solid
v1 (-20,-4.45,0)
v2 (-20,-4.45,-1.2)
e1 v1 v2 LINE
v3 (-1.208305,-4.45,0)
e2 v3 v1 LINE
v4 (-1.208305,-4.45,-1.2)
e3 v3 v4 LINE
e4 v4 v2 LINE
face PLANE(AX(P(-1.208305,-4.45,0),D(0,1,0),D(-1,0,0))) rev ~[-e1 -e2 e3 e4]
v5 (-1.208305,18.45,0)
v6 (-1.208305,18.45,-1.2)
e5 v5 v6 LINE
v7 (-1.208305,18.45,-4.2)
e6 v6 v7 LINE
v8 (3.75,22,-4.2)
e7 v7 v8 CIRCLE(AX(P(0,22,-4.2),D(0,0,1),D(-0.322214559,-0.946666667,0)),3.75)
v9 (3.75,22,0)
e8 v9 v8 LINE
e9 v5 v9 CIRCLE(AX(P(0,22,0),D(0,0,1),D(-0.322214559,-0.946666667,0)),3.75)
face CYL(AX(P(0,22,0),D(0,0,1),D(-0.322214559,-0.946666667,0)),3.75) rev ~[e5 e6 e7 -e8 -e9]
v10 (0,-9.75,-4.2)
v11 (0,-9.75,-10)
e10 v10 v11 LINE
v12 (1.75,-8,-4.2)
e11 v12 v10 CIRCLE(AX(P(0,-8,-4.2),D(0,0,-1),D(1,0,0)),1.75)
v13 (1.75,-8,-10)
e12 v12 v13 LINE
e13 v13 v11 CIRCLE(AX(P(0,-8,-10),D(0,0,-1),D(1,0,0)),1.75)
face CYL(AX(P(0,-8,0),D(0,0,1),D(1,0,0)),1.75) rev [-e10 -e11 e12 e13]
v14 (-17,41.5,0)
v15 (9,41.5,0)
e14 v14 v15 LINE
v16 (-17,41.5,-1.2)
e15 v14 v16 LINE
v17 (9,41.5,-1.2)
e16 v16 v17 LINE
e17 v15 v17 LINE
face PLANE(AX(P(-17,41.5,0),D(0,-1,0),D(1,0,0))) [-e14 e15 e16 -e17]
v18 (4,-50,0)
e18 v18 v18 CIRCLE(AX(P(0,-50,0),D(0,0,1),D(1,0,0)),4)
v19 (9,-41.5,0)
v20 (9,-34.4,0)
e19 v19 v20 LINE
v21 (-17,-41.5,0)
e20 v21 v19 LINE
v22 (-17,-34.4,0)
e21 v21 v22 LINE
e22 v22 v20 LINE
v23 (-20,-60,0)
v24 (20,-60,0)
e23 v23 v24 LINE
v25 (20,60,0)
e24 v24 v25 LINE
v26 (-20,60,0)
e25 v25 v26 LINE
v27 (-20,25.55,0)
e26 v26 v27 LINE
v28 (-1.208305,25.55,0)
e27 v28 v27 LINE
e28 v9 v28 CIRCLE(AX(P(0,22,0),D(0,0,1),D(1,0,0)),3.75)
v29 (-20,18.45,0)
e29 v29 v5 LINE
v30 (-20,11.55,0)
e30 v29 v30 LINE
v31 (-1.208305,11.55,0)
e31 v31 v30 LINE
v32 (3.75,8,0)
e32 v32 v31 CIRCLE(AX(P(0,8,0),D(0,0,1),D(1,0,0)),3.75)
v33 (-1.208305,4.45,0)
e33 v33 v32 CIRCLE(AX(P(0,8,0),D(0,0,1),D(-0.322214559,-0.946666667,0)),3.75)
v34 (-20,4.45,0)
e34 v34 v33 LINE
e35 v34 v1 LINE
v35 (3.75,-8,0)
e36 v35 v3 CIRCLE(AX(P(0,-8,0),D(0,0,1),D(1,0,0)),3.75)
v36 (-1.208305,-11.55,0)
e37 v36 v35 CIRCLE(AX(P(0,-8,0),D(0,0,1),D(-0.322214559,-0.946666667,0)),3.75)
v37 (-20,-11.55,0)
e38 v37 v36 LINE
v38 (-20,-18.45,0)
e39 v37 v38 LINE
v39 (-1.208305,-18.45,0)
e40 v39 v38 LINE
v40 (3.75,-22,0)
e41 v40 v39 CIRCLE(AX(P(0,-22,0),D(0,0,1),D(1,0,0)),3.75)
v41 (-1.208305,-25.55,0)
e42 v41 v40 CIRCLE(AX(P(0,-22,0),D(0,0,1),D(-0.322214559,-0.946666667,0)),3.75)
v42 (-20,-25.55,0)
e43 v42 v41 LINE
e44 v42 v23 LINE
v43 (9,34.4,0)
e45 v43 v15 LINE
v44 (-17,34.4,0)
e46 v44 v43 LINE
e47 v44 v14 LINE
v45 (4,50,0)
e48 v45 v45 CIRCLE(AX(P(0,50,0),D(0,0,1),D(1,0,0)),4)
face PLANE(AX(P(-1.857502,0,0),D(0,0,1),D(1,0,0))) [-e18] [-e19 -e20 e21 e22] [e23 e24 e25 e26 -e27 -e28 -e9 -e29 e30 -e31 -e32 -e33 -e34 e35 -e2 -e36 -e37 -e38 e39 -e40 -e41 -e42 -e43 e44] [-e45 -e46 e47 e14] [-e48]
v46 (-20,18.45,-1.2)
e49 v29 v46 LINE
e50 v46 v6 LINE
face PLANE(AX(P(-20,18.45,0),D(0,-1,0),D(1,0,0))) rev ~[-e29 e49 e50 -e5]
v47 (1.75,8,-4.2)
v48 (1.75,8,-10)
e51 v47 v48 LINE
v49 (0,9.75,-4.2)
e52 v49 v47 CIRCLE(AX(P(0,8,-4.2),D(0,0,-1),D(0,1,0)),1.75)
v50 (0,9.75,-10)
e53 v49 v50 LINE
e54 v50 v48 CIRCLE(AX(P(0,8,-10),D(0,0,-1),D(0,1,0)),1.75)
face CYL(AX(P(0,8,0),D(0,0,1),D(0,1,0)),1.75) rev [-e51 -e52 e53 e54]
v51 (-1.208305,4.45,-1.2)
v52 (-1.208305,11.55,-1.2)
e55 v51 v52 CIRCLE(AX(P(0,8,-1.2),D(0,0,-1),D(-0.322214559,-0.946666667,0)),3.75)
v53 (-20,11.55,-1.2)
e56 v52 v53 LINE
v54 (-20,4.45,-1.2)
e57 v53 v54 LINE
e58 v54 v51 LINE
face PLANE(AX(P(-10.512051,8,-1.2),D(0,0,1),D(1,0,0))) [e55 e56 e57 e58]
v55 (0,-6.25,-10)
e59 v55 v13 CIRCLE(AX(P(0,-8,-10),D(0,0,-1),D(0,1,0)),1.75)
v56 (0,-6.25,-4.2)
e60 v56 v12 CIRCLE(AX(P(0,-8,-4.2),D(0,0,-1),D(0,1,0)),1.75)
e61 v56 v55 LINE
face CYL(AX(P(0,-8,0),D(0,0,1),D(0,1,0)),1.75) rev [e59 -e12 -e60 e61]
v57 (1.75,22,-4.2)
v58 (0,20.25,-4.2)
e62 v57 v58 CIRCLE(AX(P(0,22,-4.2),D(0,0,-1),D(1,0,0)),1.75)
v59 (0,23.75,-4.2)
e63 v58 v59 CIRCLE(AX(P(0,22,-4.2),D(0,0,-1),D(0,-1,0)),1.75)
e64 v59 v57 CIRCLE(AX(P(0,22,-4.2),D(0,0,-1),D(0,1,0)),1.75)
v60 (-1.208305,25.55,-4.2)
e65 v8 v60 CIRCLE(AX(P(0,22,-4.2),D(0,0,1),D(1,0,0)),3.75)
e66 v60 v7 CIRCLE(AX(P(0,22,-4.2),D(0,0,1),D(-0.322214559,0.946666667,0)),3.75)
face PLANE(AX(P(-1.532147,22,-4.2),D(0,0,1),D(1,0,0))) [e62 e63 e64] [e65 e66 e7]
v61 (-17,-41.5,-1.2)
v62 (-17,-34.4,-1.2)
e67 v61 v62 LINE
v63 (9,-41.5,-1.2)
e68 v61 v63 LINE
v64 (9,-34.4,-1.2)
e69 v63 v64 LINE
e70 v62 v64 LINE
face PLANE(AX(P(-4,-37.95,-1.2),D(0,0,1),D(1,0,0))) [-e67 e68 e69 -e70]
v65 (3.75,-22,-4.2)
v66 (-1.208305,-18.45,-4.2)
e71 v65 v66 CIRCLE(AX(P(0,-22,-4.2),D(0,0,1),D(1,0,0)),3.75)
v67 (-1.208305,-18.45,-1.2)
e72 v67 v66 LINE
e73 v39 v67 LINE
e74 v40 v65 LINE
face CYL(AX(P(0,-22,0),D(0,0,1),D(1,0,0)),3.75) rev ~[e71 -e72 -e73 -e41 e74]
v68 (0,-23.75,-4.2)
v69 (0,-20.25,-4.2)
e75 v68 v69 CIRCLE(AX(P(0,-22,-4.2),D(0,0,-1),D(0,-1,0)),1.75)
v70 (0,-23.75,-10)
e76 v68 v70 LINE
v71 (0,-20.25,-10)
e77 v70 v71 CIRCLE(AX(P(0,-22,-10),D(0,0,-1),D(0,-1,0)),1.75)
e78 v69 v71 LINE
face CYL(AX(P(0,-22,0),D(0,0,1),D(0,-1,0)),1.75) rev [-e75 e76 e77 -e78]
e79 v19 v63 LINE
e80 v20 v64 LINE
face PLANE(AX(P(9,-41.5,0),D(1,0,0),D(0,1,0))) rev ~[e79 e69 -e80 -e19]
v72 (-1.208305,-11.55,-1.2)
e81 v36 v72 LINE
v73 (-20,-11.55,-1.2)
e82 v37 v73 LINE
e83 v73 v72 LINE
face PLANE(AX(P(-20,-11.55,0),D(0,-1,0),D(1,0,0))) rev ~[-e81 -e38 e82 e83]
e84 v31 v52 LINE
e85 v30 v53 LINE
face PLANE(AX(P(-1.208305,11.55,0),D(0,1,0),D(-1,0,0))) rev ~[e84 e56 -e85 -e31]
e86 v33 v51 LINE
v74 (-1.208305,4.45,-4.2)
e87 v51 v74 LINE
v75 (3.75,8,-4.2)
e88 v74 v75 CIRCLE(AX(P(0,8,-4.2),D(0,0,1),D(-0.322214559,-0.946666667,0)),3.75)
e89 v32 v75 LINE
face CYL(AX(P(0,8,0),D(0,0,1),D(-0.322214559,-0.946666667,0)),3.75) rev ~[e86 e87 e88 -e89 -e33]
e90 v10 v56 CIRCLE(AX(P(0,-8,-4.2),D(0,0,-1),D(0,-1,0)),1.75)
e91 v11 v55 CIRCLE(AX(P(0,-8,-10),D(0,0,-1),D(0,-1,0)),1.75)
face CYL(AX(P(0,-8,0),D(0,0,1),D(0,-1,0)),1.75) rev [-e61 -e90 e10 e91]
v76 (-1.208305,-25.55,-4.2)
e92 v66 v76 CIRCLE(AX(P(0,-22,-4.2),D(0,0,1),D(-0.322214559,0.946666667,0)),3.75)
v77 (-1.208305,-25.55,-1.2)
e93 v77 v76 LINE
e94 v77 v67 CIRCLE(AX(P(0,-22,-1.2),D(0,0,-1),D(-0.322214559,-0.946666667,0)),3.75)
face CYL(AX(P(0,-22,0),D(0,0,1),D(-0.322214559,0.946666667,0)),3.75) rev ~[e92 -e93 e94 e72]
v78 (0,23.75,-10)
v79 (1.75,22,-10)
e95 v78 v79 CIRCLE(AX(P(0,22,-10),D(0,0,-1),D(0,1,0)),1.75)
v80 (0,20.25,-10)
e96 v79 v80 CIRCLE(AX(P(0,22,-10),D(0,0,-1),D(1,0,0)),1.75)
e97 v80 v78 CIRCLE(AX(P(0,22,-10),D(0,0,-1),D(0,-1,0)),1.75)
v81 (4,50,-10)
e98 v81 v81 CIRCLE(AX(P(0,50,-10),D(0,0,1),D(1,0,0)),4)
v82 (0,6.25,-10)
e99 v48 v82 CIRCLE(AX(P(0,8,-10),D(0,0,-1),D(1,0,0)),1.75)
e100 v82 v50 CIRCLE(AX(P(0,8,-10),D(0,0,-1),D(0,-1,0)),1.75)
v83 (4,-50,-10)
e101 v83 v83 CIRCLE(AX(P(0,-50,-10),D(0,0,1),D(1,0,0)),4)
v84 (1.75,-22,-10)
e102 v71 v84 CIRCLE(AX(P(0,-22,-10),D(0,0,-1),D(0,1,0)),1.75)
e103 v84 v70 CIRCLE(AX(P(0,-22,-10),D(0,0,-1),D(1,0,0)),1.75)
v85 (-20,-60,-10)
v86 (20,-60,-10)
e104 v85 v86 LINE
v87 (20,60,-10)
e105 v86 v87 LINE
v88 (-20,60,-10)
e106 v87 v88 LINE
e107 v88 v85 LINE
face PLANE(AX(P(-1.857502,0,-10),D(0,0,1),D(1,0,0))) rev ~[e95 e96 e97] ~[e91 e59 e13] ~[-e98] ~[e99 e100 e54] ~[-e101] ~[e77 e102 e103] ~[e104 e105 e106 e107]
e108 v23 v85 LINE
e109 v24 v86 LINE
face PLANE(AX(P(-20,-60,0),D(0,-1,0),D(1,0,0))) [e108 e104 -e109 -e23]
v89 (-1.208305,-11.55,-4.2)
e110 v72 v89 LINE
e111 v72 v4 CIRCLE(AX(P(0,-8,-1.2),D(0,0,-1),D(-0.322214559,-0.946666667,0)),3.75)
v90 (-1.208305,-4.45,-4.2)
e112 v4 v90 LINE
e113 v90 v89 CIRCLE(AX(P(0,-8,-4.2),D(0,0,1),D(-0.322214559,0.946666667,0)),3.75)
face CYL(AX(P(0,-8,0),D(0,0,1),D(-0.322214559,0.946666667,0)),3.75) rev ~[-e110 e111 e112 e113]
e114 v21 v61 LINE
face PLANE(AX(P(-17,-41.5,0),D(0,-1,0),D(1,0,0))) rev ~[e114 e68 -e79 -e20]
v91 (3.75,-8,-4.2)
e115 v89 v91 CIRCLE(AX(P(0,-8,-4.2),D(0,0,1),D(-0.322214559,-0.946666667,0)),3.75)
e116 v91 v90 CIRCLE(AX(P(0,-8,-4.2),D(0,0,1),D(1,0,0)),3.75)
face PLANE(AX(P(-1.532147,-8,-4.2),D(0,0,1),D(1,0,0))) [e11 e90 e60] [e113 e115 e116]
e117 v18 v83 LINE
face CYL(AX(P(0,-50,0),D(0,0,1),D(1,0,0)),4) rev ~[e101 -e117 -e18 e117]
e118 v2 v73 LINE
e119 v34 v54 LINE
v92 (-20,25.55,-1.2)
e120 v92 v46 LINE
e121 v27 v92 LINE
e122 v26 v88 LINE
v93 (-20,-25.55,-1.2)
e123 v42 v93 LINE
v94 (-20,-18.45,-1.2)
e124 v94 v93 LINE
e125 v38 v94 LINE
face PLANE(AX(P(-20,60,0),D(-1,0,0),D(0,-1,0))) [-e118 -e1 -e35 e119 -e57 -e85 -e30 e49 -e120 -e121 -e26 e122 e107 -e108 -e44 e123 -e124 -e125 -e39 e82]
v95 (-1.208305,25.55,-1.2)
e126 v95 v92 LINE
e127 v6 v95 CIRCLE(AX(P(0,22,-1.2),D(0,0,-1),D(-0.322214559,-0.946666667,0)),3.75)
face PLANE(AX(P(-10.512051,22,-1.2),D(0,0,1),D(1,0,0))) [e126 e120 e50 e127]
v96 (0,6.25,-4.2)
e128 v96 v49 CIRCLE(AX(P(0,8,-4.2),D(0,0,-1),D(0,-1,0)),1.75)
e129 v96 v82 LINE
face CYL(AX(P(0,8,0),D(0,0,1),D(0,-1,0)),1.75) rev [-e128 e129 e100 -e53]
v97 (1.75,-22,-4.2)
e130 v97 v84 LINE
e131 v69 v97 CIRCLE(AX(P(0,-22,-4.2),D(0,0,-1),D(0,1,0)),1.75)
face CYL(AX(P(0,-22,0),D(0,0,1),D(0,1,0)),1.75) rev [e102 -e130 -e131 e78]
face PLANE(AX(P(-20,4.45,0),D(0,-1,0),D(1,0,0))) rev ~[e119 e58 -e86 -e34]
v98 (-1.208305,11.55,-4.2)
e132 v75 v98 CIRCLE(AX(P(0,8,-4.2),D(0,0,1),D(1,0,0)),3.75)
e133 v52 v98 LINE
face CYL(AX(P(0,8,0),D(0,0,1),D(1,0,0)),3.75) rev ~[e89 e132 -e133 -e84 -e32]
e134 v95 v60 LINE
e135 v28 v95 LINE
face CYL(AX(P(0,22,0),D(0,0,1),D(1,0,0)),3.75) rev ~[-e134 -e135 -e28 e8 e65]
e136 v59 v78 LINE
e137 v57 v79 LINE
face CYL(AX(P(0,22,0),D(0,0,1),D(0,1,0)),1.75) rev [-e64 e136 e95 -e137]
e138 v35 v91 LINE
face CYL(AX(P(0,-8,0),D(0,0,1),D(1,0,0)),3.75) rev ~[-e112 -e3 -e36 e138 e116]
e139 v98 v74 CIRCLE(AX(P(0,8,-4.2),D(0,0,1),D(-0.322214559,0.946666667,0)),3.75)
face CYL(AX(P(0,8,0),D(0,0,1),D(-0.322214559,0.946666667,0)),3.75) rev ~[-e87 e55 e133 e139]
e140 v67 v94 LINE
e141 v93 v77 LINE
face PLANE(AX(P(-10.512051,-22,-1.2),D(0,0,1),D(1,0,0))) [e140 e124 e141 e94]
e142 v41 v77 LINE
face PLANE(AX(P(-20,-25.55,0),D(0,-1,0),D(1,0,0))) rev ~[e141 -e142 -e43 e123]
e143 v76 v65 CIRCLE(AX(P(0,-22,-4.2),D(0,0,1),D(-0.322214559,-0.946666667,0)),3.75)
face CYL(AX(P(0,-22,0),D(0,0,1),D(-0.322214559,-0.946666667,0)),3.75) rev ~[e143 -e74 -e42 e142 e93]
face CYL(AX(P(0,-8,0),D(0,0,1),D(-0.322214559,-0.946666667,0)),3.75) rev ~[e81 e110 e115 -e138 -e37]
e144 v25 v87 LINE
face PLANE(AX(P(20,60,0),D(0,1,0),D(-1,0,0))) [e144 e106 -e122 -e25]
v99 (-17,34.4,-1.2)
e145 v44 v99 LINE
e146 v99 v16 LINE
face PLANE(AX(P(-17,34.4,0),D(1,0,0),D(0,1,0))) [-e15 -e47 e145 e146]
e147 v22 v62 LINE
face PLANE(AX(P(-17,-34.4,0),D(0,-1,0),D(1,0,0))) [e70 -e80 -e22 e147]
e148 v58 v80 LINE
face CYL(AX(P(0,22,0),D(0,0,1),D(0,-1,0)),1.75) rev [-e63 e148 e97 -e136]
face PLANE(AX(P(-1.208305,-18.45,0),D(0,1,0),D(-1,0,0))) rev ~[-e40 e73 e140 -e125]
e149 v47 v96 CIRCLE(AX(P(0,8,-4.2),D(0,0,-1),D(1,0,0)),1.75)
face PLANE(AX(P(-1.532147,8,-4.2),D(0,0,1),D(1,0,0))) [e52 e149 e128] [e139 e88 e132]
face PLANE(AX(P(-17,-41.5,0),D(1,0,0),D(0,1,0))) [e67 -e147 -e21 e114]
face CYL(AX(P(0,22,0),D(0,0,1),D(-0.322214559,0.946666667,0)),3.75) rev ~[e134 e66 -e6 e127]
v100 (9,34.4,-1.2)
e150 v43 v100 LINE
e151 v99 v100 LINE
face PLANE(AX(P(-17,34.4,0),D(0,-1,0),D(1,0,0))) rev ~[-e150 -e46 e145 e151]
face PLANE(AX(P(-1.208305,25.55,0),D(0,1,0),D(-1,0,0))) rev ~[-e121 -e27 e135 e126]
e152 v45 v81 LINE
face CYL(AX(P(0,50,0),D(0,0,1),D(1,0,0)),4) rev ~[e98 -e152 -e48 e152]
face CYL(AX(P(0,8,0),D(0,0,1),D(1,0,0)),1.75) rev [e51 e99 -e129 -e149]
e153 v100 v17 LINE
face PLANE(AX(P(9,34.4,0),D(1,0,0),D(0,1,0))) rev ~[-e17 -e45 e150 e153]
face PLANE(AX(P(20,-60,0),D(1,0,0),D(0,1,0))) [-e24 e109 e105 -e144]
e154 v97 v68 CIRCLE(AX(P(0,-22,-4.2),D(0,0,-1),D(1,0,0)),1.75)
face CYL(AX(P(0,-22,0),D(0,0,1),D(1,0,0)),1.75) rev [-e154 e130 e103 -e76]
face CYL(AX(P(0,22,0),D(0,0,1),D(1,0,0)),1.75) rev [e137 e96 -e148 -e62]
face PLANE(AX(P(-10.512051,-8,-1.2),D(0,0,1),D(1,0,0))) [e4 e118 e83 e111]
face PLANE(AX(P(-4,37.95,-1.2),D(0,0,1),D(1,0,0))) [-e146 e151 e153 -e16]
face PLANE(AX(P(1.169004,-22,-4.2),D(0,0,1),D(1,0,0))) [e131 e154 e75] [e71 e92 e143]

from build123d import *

# Parameters (mm, degrees)
F0_W     = 26
F0_H     = 7.1
F0_R     = 4
F1_DEPTH = 10
F2_DEPTH = 1.2
F3_DEPTH = 4.2


# Not quite as in the source:
# - a feature names something its author has since deleted; it is built from what else it names


with BuildPart() as f1:
    # F0 (on Top) → F1 (new body)
    with BuildSketch(Plane.XY):
        with BuildLine():
            Line((-20, -60), (20, -60))
            Line((20, -60), (20, 60))
            Line((20, 60), (-20, 60))
            Line((-20, 60), (-20, 25.55))
            Line((-20, 25.55), (-1.2083045974, 25.55))
            ThreePointArc((-1.2083045974, 25.55), (2.1830434902, 25.0490688939), (3.75, 22))
            ThreePointArc((3.75, 22), (2.1830434902, 18.9509311061), (-1.2083045974, 18.45))
            Line((-1.2083045974, 18.45), (-20, 18.45))
            Line((-20, 18.45), (-20, 11.55))
            Line((-20, 11.55), (-1.2083045974, 11.55))
            ThreePointArc((-1.2083045974, 11.55), (2.1830434902, 11.0490688939), (3.75, 8))
            ThreePointArc((3.75, 8), (2.1830434902, 4.9509311061), (-1.2083045974, 4.45))
            Line((-1.2083045974, 4.45), (-20, 4.45))
            Line((-20, 4.45), (-20, -4.45))
            Line((-20, -4.45), (-1.2083045974, -4.45))
            ThreePointArc((-1.2083045974, -4.45), (2.1830434902, -4.9509311061), (3.75, -8))
            ThreePointArc((3.75, -8), (2.1830434902, -11.0490688939), (-1.2083045974, -11.55))
            Line((-1.2083045974, -11.55), (-20, -11.55))
            Line((-20, -11.55), (-20, -18.45))
            Line((-20, -18.45), (-1.2083045974, -18.45))
            ThreePointArc((-1.2083045974, -18.45), (2.1830434902, -18.9509311061), (3.75, -22))
            ThreePointArc((3.75, -22), (2.1830434902, -25.0490688939), (-1.2083045974, -25.55))
            Line((-1.2083045974, -25.55), (-20, -25.55))
            Line((-20, -25.55), (-20, -60))
        make_face()
        with Locations((-4, -37.95)):
            Rectangle(F0_W, F0_H, mode=Mode.SUBTRACT)
        with Locations((0, -50)):
            Circle(F0_R, mode=Mode.SUBTRACT)
        with Locations((-4, 37.95)):
            Rectangle(F0_W, F0_H, mode=Mode.SUBTRACT)
        with Locations((0, 50)):
            Circle(F0_R, mode=Mode.SUBTRACT)
        with BuildLine():
            Line((-20, -18.45), (-20, -25.55))
            Line((-20, -25.55), (-1.2083045974, -25.55))
            ThreePointArc((-1.2083045974, -25.55), (-3.75, -22), (-1.2083045974, -18.45))
            Line((-1.2083045974, -18.45), (-20, -18.45))
        make_face()
        with BuildLine():
            Line((-1.2083045974, 25.55), (-20, 25.55))
            Line((-20, 25.55), (-20, 18.45))
            Line((-20, 18.45), (-1.2083045974, 18.45))
            ThreePointArc((-1.2083045974, 18.45), (-3.75, 22), (-1.2083045974, 25.55))
        make_face()
        with BuildLine():
            Line((-20, -4.45), (-20, -11.55))
            Line((-20, -11.55), (-1.2083045974, -11.55))
            ThreePointArc((-1.2083045974, -11.55), (-3.75, -8), (-1.2083045974, -4.45))
            Line((-1.2083045974, -4.45), (-20, -4.45))
        make_face()
        with BuildLine():
            Line((-1.2083045974, 11.55), (-20, 11.55))
            Line((-20, 11.55), (-20, 4.45))
            Line((-20, 4.45), (-1.2083045974, 4.45))
            ThreePointArc((-1.2083045974, 4.45), (-3.75, 8), (-1.2083045974, 11.55))
        make_face()
        with BuildLine():
            Line((0, 25.55), (-1.2083045974, 25.55))
            ThreePointArc((-1.2083045974, 25.55), (-3.75, 22), (-1.2083045974, 18.45))
            Line((-1.2083045974, 18.45), (0, 18.45))
            Line((0, 18.45), (0, 20.25))
            ThreePointArc((0, 20.25), (-1.75, 22), (0, 23.75))
            Line((0, 23.75), (0, 25.55))
        make_face()
        with BuildLine():
            ThreePointArc((3.75, 22), (2.1830434902, 25.0490688939), (-1.2083045974, 25.55))
            Line((-1.2083045974, 25.55), (0, 25.55))
            Line((0, 25.55), (0, 23.75))
            ThreePointArc((0, 23.75), (1.2374368671, 23.2374368671), (1.75, 22))
            ThreePointArc((1.75, 22), (1.2374368671, 20.7625631329), (0, 20.25))
            Line((0, 20.25), (0, 18.45))
            Line((0, 18.45), (-1.2083045974, 18.45))
            ThreePointArc((-1.2083045974, 18.45), (2.1830434902, 18.9509311061), (3.75, 22))
        make_face()
        with BuildLine():
            ThreePointArc((3.75, 8), (2.1830434902, 11.0490688939), (-1.2083045974, 11.55))
            Line((-1.2083045974, 11.55), (0, 11.55))
            Line((0, 11.55), (0, 9.75))
            ThreePointArc((0, 9.75), (1.2374368671, 9.2374368671), (1.75, 8))
            ThreePointArc((1.75, 8), (1.2374368671, 6.7625631329), (0, 6.25))
            Line((0, 6.25), (0, 4.45))
            Line((0, 4.45), (-1.2083045974, 4.45))
            ThreePointArc((-1.2083045974, 4.45), (2.1830434902, 4.9509311061), (3.75, 8))
        make_face()
        with BuildLine():
            Line((0, 11.55), (-1.2083045974, 11.55))
            ThreePointArc((-1.2083045974, 11.55), (-3.75, 8), (-1.2083045974, 4.45))
            Line((-1.2083045974, 4.45), (0, 4.45))
            Line((0, 4.45), (0, 6.25))
            ThreePointArc((0, 6.25), (-1.75, 8), (0, 9.75))
            Line((0, 9.75), (0, 11.55))
        make_face()
        with BuildLine():
            ThreePointArc((-1.2083045974, -4.45), (-3.75, -8), (-1.2083045974, -11.55))
            Line((-1.2083045974, -11.55), (0, -11.55))
            Line((0, -11.55), (0, -9.75))
            ThreePointArc((0, -9.75), (-1.75, -8), (0, -6.25))
            Line((0, -6.25), (0, -4.45))
            Line((0, -4.45), (-1.2083045974, -4.45))
        make_face()
        with BuildLine():
            Line((0, -11.55), (-1.2083045974, -11.55))
            ThreePointArc((-1.2083045974, -11.55), (2.1830434902, -11.0490688939), (3.75, -8))
            ThreePointArc((3.75, -8), (2.1830434902, -4.9509311061), (-1.2083045974, -4.45))
            Line((-1.2083045974, -4.45), (0, -4.45))
            Line((0, -4.45), (0, -6.25))
            ThreePointArc((0, -6.25), (1.2374368671, -6.7625631329), (1.75, -8))
            ThreePointArc((1.75, -8), (1.2374368671, -9.2374368671), (0, -9.75))
            Line((0, -9.75), (0, -11.55))
        make_face()
        with BuildLine():
            Line((0, -25.55), (-1.2083045974, -25.55))
            ThreePointArc((-1.2083045974, -25.55), (2.1830434902, -25.0490688939), (3.75, -22))
            ThreePointArc((3.75, -22), (2.1830434902, -18.9509311061), (-1.2083045974, -18.45))
            Line((-1.2083045974, -18.45), (0, -18.45))
            Line((0, -18.45), (0, -20.25))
            ThreePointArc((0, -20.25), (1.2374368671, -20.7625631329), (1.75, -22))
            ThreePointArc((1.75, -22), (1.2374368671, -23.2374368671), (0, -23.75))
            Line((0, -23.75), (0, -25.55))
        make_face()
        with BuildLine():
            ThreePointArc((-1.2083045974, -18.45), (-3.75, -22), (-1.2083045974, -25.55))
            Line((-1.2083045974, -25.55), (0, -25.55))
            Line((0, -25.55), (0, -23.75))
            ThreePointArc((0, -23.75), (-1.75, -22), (0, -20.25))
            Line((0, -20.25), (0, -18.45))
            Line((0, -18.45), (-1.2083045974, -18.45))
        make_face()
        with Locations((-4, 37.95)):
            Rectangle(F0_W, F0_H)
        with Locations((-4, -37.95)):
            Rectangle(F0_W, F0_H)
    extrude(amount=-F1_DEPTH)

    # F0 (on Top) → F2 (cut)
    with BuildSketch(Plane.XY):
        with BuildLine():
            Line((-1.2083045974, 25.55), (-20, 25.55))
            Line((-20, 25.55), (-20, 18.45))
            Line((-20, 18.45), (-1.2083045974, 18.45))
            ThreePointArc((-1.2083045974, 18.45), (-3.75, 22), (-1.2083045974, 25.55))
        make_face()
        with BuildLine():
            Line((-1.2083045974, 11.55), (-20, 11.55))
            Line((-20, 11.55), (-20, 4.45))
            Line((-20, 4.45), (-1.2083045974, 4.45))
            ThreePointArc((-1.2083045974, 4.45), (-3.75, 8), (-1.2083045974, 11.55))
        make_face()
        with BuildLine():
            Line((-20, -4.45), (-20, -11.55))
            Line((-20, -11.55), (-1.2083045974, -11.55))
            ThreePointArc((-1.2083045974, -11.55), (-3.75, -8), (-1.2083045974, -4.45))
            Line((-1.2083045974, -4.45), (-20, -4.45))
        make_face()
        with BuildLine():
            Line((-20, -18.45), (-20, -25.55))
            Line((-20, -25.55), (-1.2083045974, -25.55))
            ThreePointArc((-1.2083045974, -25.55), (-3.75, -22), (-1.2083045974, -18.45))
            Line((-1.2083045974, -18.45), (-20, -18.45))
        make_face()
        with Locations((-4, 37.95)):
            Rectangle(F0_W, F0_H)
        with Locations((-4, -37.95)):
            Rectangle(F0_W, F0_H)
    extrude(amount=-F2_DEPTH, mode=Mode.SUBTRACT)

    # F0 (on Top) → F3 (cut)
    with BuildSketch(Plane.XY):
        with BuildLine():
            Line((0, 25.55), (-1.2083045974, 25.55))
            ThreePointArc((-1.2083045974, 25.55), (-3.75, 22), (-1.2083045974, 18.45))
            Line((-1.2083045974, 18.45), (0, 18.45))
            Line((0, 18.45), (0, 20.25))
            ThreePointArc((0, 20.25), (-1.75, 22), (0, 23.75))
            Line((0, 23.75), (0, 25.55))
        make_face()
        with BuildLine():
            ThreePointArc((3.75, 22), (2.1830434902, 25.0490688939), (-1.2083045974, 25.55))
            Line((-1.2083045974, 25.55), (0, 25.55))
            Line((0, 25.55), (0, 23.75))
            ThreePointArc((0, 23.75), (1.2374368671, 23.2374368671), (1.75, 22))
            ThreePointArc((1.75, 22), (1.2374368671, 20.7625631329), (0, 20.25))
            Line((0, 20.25), (0, 18.45))
            Line((0, 18.45), (-1.2083045974, 18.45))
            ThreePointArc((-1.2083045974, 18.45), (2.1830434902, 18.9509311061), (3.75, 22))
        make_face()
        with BuildLine():
            Line((0, 11.55), (-1.2083045974, 11.55))
            ThreePointArc((-1.2083045974, 11.55), (-3.75, 8), (-1.2083045974, 4.45))
            Line((-1.2083045974, 4.45), (0, 4.45))
            Line((0, 4.45), (0, 6.25))
            ThreePointArc((0, 6.25), (-1.75, 8), (0, 9.75))
            Line((0, 9.75), (0, 11.55))
        make_face()
        with BuildLine():
            ThreePointArc((3.75, 8), (2.1830434902, 11.0490688939), (-1.2083045974, 11.55))
            Line((-1.2083045974, 11.55), (0, 11.55))
            Line((0, 11.55), (0, 9.75))
            ThreePointArc((0, 9.75), (1.2374368671, 9.2374368671), (1.75, 8))
            ThreePointArc((1.75, 8), (1.2374368671, 6.7625631329), (0, 6.25))
            Line((0, 6.25), (0, 4.45))
            Line((0, 4.45), (-1.2083045974, 4.45))
            ThreePointArc((-1.2083045974, 4.45), (2.1830434902, 4.9509311061), (3.75, 8))
        make_face()
        with BuildLine():
            ThreePointArc((-1.2083045974, -4.45), (-3.75, -8), (-1.2083045974, -11.55))
            Line((-1.2083045974, -11.55), (0, -11.55))
            Line((0, -11.55), (0, -9.75))
            ThreePointArc((0, -9.75), (-1.75, -8), (0, -6.25))
            Line((0, -6.25), (0, -4.45))
            Line((0, -4.45), (-1.2083045974, -4.45))
        make_face()
        with BuildLine():
            Line((0, -11.55), (-1.2083045974, -11.55))
            ThreePointArc((-1.2083045974, -11.55), (2.1830434902, -11.0490688939), (3.75, -8))
            ThreePointArc((3.75, -8), (2.1830434902, -4.9509311061), (-1.2083045974, -4.45))
            Line((-1.2083045974, -4.45), (0, -4.45))
            Line((0, -4.45), (0, -6.25))
            ThreePointArc((0, -6.25), (1.2374368671, -6.7625631329), (1.75, -8))
            ThreePointArc((1.75, -8), (1.2374368671, -9.2374368671), (0, -9.75))
            Line((0, -9.75), (0, -11.55))
        make_face()
        with BuildLine():
            Line((0, -25.55), (-1.2083045974, -25.55))
            ThreePointArc((-1.2083045974, -25.55), (2.1830434902, -25.0490688939), (3.75, -22))
            ThreePointArc((3.75, -22), (2.1830434902, -18.9509311061), (-1.2083045974, -18.45))
            Line((-1.2083045974, -18.45), (0, -18.45))
            Line((0, -18.45), (0, -20.25))
            ThreePointArc((0, -20.25), (1.2374368671, -20.7625631329), (1.75, -22))
            ThreePointArc((1.75, -22), (1.2374368671, -23.2374368671), (0, -23.75))
            Line((0, -23.75), (0, -25.55))
        make_face()
        with BuildLine():
            ThreePointArc((-1.2083045974, -18.45), (-3.75, -22), (-1.2083045974, -25.55))
            Line((-1.2083045974, -25.55), (0, -25.55))
            Line((0, -25.55), (0, -23.75))
            ThreePointArc((0, -23.75), (-1.75, -22), (0, -20.25))
            Line((0, -20.25), (0, -18.45))
            Line((0, -18.45), (-1.2083045974, -18.45))
        make_face()
    extrude(amount=-F3_DEPTH, mode=Mode.SUBTRACT)


solid = f1.part
